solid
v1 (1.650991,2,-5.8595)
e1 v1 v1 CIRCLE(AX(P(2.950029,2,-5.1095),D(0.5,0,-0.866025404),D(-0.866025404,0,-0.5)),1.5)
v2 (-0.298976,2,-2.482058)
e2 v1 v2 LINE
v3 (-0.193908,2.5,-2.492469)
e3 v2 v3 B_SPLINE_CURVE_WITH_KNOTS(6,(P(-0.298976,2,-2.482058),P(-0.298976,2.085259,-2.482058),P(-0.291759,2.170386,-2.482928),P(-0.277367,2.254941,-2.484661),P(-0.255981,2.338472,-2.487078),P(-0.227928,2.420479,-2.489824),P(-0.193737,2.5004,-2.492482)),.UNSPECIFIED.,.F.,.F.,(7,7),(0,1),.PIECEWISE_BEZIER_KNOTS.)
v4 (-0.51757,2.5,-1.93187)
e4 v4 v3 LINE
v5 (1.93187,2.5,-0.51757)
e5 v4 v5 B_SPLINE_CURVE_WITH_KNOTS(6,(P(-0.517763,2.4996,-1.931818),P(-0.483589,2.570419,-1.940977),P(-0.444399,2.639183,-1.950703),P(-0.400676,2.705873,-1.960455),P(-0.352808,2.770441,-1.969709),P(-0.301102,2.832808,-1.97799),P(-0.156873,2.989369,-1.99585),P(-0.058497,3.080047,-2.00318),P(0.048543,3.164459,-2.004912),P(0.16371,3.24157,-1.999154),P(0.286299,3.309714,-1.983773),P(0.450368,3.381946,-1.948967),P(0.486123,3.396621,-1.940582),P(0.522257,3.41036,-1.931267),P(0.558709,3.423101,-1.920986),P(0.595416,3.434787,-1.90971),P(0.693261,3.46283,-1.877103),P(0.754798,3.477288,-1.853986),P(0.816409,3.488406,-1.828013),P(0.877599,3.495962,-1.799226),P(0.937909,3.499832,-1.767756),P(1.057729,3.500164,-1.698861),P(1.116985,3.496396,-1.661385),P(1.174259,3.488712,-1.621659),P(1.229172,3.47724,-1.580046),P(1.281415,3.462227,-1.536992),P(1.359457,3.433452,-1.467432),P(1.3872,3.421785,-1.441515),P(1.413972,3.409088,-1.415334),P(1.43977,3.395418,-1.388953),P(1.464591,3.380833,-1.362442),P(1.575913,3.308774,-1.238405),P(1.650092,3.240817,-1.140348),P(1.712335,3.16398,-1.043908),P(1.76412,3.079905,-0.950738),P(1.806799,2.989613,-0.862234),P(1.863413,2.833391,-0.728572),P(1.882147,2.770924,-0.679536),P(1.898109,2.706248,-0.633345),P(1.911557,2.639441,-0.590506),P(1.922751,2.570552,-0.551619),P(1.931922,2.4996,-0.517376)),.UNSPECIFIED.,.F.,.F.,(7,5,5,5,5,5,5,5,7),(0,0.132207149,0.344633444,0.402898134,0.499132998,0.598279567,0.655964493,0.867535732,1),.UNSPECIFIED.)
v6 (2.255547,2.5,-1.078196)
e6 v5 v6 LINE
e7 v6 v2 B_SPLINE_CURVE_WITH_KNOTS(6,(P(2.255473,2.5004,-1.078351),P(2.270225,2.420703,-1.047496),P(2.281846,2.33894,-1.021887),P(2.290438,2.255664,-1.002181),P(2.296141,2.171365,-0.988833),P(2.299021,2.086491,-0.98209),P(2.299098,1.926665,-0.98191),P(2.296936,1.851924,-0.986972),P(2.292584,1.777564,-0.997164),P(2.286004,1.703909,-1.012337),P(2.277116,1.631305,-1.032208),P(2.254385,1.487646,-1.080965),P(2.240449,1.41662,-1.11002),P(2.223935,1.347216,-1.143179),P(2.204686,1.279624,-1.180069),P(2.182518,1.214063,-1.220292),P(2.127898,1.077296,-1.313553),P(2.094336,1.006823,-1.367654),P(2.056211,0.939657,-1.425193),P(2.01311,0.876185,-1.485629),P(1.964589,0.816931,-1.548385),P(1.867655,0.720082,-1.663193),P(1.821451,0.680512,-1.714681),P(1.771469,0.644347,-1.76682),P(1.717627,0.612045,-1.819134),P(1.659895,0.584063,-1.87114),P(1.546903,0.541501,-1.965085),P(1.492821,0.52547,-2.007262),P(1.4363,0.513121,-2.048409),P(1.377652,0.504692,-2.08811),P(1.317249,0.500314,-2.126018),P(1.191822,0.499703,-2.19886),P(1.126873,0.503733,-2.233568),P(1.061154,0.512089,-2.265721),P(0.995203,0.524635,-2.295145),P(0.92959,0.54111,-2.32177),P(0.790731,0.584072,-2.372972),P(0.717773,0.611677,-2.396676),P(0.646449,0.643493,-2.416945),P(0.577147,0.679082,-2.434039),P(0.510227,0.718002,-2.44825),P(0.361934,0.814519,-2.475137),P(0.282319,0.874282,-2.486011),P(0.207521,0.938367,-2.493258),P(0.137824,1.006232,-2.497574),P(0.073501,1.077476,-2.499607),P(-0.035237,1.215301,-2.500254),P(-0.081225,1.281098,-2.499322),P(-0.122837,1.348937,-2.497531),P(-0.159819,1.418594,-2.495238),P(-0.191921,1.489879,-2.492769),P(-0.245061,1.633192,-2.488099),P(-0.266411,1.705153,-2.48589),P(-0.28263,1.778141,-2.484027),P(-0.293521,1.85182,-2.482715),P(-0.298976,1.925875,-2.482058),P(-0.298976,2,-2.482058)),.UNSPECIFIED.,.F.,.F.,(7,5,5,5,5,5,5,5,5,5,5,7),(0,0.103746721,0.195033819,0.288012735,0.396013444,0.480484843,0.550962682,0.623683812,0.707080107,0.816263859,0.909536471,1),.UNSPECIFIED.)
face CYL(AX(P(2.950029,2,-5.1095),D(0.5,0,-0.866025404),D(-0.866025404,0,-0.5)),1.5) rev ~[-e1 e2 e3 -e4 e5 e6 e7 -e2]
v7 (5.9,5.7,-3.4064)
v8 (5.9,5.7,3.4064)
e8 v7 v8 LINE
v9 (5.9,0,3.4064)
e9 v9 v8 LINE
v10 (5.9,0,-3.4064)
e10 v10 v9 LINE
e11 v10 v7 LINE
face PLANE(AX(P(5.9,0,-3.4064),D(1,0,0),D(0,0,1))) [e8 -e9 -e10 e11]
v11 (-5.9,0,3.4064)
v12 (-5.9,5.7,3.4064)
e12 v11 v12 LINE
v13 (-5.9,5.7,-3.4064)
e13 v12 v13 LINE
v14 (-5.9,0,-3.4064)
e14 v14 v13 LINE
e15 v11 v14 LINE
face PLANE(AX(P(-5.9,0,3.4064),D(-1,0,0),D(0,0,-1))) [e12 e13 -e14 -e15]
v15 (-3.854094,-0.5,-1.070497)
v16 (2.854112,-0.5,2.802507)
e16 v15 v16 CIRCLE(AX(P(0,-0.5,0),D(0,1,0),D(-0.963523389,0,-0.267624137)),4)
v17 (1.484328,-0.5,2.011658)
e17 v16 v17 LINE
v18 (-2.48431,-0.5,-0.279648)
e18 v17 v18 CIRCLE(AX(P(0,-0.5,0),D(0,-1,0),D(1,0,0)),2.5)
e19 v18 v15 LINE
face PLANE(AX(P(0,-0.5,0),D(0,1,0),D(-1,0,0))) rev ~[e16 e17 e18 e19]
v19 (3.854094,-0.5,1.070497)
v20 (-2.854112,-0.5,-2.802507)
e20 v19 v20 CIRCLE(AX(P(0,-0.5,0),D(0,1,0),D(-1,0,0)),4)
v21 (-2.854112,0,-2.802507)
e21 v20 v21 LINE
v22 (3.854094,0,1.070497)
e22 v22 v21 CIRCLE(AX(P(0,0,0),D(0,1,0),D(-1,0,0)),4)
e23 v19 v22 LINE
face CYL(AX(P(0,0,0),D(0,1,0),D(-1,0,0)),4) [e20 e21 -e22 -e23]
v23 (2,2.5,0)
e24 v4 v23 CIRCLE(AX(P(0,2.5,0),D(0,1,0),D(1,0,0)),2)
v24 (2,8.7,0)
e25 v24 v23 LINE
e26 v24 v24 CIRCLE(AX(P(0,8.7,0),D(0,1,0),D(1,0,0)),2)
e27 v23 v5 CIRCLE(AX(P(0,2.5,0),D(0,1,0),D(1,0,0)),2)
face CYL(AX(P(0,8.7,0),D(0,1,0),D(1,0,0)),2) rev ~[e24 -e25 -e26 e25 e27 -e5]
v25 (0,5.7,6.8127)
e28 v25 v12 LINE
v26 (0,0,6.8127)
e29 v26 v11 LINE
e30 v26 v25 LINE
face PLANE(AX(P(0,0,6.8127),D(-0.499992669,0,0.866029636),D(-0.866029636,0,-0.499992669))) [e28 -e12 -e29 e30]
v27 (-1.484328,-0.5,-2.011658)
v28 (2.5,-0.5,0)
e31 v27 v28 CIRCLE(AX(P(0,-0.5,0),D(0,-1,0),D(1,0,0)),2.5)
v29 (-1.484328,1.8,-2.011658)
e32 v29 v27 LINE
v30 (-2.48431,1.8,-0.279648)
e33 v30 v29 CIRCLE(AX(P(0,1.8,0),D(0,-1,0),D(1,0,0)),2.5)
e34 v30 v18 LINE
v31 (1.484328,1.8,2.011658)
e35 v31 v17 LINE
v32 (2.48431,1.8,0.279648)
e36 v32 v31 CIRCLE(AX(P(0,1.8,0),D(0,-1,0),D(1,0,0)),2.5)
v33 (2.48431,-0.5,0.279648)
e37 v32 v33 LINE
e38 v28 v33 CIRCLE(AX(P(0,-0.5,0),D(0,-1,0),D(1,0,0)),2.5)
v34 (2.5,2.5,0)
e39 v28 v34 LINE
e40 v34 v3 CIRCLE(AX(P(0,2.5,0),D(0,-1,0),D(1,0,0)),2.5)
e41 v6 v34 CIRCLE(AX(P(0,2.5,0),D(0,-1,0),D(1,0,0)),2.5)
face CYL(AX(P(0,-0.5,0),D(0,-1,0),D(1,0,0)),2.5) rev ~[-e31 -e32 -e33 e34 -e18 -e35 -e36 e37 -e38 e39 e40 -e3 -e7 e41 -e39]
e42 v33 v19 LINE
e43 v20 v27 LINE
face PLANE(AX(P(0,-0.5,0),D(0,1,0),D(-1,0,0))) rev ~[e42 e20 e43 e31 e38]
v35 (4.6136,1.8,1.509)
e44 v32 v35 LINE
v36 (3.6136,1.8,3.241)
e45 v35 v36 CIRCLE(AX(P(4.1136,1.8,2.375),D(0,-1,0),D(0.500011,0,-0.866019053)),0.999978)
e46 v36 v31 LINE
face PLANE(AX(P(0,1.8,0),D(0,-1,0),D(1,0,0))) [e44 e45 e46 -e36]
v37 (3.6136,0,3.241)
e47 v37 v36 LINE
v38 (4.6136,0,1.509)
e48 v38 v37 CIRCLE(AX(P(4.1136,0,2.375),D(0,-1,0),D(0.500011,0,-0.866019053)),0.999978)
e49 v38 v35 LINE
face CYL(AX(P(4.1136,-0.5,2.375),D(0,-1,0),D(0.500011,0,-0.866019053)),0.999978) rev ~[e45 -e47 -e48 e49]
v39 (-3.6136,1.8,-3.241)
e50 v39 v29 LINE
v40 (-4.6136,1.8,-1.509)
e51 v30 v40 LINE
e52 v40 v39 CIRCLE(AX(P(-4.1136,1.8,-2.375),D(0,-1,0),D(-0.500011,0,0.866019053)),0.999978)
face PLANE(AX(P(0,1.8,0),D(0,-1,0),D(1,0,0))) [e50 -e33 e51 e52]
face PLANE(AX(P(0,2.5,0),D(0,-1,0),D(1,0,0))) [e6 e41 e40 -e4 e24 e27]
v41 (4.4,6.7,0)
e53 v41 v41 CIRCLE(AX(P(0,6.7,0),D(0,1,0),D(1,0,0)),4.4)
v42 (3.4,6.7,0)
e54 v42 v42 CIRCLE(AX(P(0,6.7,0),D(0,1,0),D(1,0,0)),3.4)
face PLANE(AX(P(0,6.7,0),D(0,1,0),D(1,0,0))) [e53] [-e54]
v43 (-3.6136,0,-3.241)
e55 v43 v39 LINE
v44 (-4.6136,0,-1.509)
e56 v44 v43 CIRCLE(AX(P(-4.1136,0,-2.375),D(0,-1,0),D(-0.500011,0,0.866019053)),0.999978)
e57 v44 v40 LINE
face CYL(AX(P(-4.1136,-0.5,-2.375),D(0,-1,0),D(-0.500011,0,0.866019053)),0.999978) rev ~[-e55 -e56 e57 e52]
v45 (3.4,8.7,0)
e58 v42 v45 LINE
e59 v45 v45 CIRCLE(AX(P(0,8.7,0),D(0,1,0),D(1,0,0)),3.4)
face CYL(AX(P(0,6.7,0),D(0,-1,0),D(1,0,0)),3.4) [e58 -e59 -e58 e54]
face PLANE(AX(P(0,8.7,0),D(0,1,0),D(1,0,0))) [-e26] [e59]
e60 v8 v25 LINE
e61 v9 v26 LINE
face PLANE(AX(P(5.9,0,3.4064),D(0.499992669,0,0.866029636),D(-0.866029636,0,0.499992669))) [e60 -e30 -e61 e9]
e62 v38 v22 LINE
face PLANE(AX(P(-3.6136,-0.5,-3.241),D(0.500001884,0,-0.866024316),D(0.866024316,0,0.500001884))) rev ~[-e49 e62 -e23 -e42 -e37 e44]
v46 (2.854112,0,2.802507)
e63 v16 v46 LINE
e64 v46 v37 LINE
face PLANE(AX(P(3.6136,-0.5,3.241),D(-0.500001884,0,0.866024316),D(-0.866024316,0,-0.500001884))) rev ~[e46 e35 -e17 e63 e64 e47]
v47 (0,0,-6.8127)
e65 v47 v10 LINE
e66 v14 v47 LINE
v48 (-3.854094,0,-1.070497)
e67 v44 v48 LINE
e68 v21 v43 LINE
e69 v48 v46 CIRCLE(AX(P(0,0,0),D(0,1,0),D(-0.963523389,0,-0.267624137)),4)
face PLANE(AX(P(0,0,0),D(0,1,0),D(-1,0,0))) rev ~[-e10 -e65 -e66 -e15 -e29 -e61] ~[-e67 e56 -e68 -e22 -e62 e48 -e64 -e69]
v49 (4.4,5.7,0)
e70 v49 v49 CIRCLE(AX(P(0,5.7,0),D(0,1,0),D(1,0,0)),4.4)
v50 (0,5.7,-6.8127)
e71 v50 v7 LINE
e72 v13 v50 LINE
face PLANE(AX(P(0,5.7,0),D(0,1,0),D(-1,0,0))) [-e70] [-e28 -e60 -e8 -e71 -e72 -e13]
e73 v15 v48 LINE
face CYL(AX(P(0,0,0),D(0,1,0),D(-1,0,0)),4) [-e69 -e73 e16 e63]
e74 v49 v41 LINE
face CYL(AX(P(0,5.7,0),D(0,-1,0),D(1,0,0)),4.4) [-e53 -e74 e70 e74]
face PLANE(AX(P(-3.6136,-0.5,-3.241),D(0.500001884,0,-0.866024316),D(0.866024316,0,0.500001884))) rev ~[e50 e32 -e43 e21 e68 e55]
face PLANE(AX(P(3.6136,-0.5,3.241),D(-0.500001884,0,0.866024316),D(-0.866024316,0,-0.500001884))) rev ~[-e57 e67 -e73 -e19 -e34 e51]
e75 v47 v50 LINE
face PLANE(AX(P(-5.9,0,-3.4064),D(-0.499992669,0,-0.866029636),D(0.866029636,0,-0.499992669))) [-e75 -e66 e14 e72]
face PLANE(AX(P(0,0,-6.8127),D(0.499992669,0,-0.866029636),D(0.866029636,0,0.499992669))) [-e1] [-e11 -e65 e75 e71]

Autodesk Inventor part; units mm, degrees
ref_plane "YZ Plane" through (0, 0, 0) normal (1, 0, 0) x (0, 1, 0)
ref_plane "XZ Plane" through (0, 0, 0) normal (0, 1, 0) x (-1, 0, 0)
ref_plane "XY Plane" through (0, 0, 0) normal (0, 0, 1) x (1, 0, 0)
sketch "Sketch1" plane through (0, 0, 0) normal (0, 1, 0) x (-1, 0, 0)
  line L0 (0, -6.8127) -> (-5.9, -3.4064)
  line L1 (-5.9, -3.4064) -> (-5.9, 3.4064)
  line L2 (-5.9, 3.4064) -> (0, 6.8127)
  line L3 (0, 6.8127) -> (5.9, 3.4064)
  line L4 (5.9, 3.4064) -> (5.9, -3.4064)
  line L5 (5.9, -3.4064) -> (0, -6.8127)
  line L6 (0, -9.5378) -> (0, 9.5378) projected
  point P0 (0, 0)
  point P1 (0, 0)
  dimension "d0" = 11.8
extrude "Extrusion1" add sketch "Sketch1" along normal blind 5.7
sketch "Sketch2" plane through (0, 5.7, 0) normal (0, 1, 0) x (1, 0, 0)
  circle A0 centre (0, 0) radius 4.4
  dimension "d3" = 8.8
extrude "Extrusion2" add sketch "Sketch2" along normal blind 1
sketch "Sketch3" plane through (0, 6.7, 0) normal (0, 1, 0) x (1, 0, 0)
  circle A0 centre (0, 0) radius 3.4
  dimension "d6" = 6.8
extrude "Extrusion3" add sketch "Sketch3" along normal blind 2
sketch "Sketch4" plane through (0, 0, 0) normal (0, 1, 0) x (-1, 0, 0)
  circle A0 centre (0, 0) radius 4
  dimension "d9" = 8
extrude "Extrusion4" add sketch "Sketch4" against normal blind 0.5
sketch "Sketch5" plane through (0, -0.5, 0) normal (0, -1, 0) x (1, 0, 0)
  circle A0 centre (0, 0) radius 2.5
  dimension "d12" = 5
extrude "Extrusion5" cut sketch "Sketch5" against normal blind 3
sketch "Sketch6" plane through (0, 8.7, 0) normal (0, 1, 0) x (1, 0, 0)
  circle A0 centre (0, 0) radius 2
  dimension "d15" = 4
extrude "Extrusion6" cut sketch "Sketch6" against normal up to next
sketch "Sketch7" plane through (0, -0.5, 0) normal (0, -1, 0) x (1, 0, 0)
  line L0 (-4.1136, -2.375) -> (4.1136, 2.375) construction
  line L1 (-3.6136, -3.241) -> (4.6136, 1.509)
  line L2 (3.6136, 3.241) -> (-4.6136, -1.509)
  arc A0 (-4.6136, -1.509) -> (-3.6136, -3.241) centre (-4.1136, -2.375) ccw
  arc A1 (4.6136, 1.509) -> (3.6136, 3.241) centre (4.1136, 2.375) ccw
  line L3 (0, 6.8127) -> (-5.9, 3.4064) projected
  point P0 (0, 0)
  point P1 (0, 0)
  dimension "d18" = 11.5
  dimension "d19" = 2
extrude "Extrusion7" cut sketch "Sketch7" against normal blind 2.3
sketch "Sketch8" plane through (0, 0, -6.8127) normal (0.5, 0, -0.8660254) x (-0.8660254, 0, -0.5)
  line L0 (0, 0) -> (0, 5.7) construction
  line L1 (-6.8127, 0) -> (-6.8127, 5.7) construction
  circle A0 centre (-3.4064, 2) radius 1.5
  line L2 (9.6112, 0) -> (-21.9003, 0) projected
  point P0 (-3.4064, 0)
  dimension "d23" = 3
  dimension "d24" = 2
  dimension "d25" = 0
extrude "Extrusion8" cut sketch "Sketch8" against normal up to surface
thread "Thread1" size "M3x0.5" class "6H" standard "ANSI Metric M Profile" full length
properties part number "RCT-H009_tuerca"
